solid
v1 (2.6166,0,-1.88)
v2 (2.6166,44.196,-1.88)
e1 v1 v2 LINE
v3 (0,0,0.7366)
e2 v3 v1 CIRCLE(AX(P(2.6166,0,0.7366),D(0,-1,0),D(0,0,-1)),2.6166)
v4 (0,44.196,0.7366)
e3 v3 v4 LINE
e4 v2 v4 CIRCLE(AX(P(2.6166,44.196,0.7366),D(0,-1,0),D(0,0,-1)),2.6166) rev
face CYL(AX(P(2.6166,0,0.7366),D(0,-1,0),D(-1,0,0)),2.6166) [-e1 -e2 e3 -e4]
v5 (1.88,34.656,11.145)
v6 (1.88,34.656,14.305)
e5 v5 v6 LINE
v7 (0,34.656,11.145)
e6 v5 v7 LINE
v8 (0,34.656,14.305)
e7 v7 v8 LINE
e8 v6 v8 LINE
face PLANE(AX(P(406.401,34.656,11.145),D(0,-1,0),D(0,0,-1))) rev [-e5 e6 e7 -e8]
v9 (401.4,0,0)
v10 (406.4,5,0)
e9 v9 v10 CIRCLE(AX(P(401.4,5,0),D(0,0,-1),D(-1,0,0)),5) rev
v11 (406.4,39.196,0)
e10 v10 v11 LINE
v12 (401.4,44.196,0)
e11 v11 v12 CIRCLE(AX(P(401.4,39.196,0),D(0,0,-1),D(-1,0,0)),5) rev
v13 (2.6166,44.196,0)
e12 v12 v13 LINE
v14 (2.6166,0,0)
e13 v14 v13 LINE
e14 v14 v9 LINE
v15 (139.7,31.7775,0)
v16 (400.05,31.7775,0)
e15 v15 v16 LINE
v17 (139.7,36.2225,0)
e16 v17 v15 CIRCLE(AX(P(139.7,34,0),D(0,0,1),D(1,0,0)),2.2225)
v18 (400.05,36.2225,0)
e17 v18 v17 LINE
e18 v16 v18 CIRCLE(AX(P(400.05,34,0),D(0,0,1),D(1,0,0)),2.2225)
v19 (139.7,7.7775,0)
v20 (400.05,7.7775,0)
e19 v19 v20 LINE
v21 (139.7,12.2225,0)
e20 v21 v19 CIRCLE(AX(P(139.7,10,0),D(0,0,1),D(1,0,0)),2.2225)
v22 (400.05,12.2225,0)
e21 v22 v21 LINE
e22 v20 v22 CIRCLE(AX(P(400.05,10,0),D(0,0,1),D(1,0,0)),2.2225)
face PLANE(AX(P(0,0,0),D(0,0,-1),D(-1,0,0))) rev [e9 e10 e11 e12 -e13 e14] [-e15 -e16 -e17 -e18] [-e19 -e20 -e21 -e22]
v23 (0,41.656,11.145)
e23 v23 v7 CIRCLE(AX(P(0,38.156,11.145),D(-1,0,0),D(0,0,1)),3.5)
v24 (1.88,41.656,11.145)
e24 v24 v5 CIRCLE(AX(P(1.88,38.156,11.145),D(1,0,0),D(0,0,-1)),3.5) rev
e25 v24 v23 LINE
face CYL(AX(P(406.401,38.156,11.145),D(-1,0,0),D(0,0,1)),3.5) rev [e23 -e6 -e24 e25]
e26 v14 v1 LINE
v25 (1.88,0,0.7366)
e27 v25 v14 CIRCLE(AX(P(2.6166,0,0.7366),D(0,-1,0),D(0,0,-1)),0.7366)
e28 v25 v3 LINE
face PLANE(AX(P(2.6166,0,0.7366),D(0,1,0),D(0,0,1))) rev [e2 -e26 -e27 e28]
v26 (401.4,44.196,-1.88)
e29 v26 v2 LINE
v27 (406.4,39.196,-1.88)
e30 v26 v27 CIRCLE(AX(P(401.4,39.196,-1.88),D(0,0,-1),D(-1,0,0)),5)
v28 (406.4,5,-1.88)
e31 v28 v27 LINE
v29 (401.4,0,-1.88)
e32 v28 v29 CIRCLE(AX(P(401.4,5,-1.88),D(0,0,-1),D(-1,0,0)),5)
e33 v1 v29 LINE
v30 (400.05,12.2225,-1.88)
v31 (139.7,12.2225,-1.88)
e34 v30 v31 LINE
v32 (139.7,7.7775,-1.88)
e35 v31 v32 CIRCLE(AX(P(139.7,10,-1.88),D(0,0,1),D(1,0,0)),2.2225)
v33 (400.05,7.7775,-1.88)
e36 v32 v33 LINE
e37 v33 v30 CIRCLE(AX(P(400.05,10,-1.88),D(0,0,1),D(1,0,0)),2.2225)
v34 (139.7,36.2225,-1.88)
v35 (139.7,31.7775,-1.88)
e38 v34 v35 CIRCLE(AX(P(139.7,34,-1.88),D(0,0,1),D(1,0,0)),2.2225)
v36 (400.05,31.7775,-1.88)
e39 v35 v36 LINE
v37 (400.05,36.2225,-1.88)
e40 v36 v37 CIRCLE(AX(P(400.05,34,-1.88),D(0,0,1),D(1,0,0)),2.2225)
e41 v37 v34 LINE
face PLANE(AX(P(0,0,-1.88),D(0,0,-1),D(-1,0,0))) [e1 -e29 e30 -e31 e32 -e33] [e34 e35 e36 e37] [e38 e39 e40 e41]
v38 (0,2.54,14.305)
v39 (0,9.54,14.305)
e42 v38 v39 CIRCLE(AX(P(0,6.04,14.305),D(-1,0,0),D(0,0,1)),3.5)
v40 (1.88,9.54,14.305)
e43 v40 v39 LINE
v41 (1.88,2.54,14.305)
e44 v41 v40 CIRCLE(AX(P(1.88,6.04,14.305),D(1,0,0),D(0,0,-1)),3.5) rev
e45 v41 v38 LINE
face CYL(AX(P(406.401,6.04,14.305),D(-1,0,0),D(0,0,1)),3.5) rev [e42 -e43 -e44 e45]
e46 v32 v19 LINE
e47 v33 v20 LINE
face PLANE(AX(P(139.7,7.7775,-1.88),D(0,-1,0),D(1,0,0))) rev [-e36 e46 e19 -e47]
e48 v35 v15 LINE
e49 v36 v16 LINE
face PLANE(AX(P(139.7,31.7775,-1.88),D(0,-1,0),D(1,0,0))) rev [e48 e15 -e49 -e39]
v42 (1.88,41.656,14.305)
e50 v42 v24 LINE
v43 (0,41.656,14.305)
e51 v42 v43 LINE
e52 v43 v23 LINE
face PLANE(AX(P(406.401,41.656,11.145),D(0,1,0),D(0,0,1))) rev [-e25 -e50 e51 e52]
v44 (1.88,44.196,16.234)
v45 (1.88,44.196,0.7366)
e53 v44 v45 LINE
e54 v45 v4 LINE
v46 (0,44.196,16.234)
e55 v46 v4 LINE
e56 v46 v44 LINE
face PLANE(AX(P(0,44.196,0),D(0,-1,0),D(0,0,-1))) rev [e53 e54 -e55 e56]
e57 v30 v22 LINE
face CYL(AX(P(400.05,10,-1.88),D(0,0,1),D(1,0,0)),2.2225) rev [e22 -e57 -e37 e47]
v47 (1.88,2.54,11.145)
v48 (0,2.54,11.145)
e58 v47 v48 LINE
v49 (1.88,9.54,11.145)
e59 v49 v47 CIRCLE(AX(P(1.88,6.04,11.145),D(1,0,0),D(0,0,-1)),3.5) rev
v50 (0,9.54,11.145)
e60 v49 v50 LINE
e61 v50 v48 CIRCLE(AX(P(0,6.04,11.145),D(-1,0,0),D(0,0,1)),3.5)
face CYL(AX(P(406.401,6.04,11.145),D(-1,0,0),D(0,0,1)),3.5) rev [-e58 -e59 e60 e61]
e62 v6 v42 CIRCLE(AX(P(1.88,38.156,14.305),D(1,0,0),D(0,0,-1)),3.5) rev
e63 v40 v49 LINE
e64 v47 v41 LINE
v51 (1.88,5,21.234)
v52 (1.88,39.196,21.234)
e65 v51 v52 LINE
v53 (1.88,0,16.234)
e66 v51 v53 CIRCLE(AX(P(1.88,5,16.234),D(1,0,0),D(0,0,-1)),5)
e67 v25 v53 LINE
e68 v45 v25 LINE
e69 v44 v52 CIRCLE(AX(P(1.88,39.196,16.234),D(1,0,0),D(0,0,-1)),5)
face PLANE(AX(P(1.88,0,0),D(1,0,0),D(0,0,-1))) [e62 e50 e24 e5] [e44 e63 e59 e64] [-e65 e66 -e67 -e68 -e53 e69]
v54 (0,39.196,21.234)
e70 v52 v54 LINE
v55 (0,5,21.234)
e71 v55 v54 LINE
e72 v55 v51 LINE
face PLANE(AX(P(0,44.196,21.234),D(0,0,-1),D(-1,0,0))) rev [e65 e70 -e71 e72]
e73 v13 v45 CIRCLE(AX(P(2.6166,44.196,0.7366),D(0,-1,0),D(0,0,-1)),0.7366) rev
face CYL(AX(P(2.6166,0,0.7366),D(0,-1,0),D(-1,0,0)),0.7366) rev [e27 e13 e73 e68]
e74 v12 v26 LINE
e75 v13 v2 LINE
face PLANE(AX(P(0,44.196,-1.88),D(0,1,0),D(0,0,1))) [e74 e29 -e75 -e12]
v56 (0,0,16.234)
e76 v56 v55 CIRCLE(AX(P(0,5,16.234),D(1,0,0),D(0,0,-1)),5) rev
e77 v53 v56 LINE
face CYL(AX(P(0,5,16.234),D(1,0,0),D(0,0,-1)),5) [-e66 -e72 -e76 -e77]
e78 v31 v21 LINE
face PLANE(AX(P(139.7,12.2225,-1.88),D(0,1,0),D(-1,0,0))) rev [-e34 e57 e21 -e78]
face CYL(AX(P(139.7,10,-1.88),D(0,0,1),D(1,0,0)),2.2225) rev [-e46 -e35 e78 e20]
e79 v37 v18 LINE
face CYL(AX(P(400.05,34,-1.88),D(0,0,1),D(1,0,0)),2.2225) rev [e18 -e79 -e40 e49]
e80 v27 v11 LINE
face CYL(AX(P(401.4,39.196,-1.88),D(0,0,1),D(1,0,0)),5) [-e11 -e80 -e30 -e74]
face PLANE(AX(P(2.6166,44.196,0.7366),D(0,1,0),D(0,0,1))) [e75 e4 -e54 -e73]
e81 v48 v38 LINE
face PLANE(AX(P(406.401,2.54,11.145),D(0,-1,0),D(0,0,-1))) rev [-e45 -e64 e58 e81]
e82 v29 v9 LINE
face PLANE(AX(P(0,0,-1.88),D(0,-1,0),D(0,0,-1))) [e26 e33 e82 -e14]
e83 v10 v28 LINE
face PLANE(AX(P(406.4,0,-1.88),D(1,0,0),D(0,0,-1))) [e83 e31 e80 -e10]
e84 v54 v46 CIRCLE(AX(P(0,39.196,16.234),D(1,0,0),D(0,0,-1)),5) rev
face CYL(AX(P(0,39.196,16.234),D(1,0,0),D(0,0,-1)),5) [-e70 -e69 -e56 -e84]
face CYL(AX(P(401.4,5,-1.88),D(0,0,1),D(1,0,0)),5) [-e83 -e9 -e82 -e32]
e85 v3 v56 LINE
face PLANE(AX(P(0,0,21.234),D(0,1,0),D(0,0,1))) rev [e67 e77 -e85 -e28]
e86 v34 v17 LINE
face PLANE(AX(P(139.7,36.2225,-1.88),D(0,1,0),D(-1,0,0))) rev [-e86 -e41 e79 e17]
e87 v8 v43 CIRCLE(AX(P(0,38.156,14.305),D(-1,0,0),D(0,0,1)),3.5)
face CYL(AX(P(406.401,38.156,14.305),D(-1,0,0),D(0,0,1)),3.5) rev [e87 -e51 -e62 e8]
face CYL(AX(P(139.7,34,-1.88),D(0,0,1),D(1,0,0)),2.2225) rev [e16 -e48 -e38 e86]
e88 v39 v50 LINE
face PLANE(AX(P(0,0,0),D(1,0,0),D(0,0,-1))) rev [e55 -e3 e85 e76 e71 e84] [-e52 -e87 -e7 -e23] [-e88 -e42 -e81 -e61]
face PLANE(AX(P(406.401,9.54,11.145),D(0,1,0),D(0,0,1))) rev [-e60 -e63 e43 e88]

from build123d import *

# Parameters (mm, degrees)
SKETCH1_W                    = 406.4
SKETCH1_H                    = 44.196
BASE_FLANGE1_DEPTH           = 1.88
EDGE_FLANGE1_STRIP_W         = 8.9932
EDGE_FLANGE1_STRIP_H         = 1.88
EDGE_FLANGE1_STRIP_CUT_DEPTH = 44.196
EDGE_FLANGE1_DEPTH           = 44.196
CUT_EXTRUDE1_REACH           = 411.347
FILLET1_R                    = 5


# Sheet-metal steps are written as plain solids
with BuildPart() as part:
    # Sketch1 → Base-Flange1 (new body)
    with BuildSketch(Plane.XY):
        with Locations((203.2, 22.098)):
            Rectangle(SKETCH1_W, SKETCH1_H)
        with BuildLine():
            Line((139.7, 36.2225), (400.05, 36.2225))
            ThreePointArc((400.05, 36.2225), (402.2725, 34), (400.05, 31.7775))
            Line((400.05, 31.7775), (139.7, 31.7775))
            ThreePointArc((139.7, 31.7775), (137.4775, 34), (139.7, 36.2225))
        make_face(mode=Mode.SUBTRACT)
        with BuildLine():
            Line((139.7, 12.2225), (400.05, 12.2225))
            ThreePointArc((400.05, 12.2225), (402.2725, 10), (400.05, 7.7775))
            Line((400.05, 7.7775), (139.7, 7.7775))
            ThreePointArc((139.7, 7.7775), (137.4775, 10), (139.7, 12.2225))
        make_face(mode=Mode.SUBTRACT)
    extrude(amount=-BASE_FLANGE1_DEPTH)

    # Edge-Flange1 strip (across the edge) → Edge-Flange1 strip cut (cut)
    with BuildSketch(Plane.XZ.offset(-44.196)):
        with Locations((-1.88, -0.94)):
            Rectangle(EDGE_FLANGE1_STRIP_W, EDGE_FLANGE1_STRIP_H)
    extrude(amount=EDGE_FLANGE1_STRIP_CUT_DEPTH, mode=Mode.SUBTRACT)

    # Edge-Flange1 section (across the edge) → Edge-Flange1 (add)
    with BuildSketch(Plane.XZ.offset(-44.196)):
        with BuildLine():
            Line((0, 0.7366), (0, 21.234))
            Line((0, 21.234), (1.88, 21.234))
            Line((1.88, 21.234), (1.88, 0.7366))
            ThreePointArc((1.88, 0.7366), (2.095745145, 0.215745145), (2.6166, 0))
            Line((2.6166, 0), (2.6166, -1.88))
            ThreePointArc((2.6166, -1.88), (0.766384396, -1.113615604), (0, 0.7366))
        make_face()
    extrude(amount=EDGE_FLANGE1_DEPTH)

    # Sketch9 → Cut-Extrude1 (cut, up to next)
    with BuildSketch(Plane.ZY, mode=Mode.PRIVATE) as cut_extrude1_sk1:
        with BuildLine():
            Line((11.145, 41.656), (14.305, 41.656))
            ThreePointArc((14.305, 41.656), (17.805, 38.156), (14.305, 34.656))
            Line((14.305, 34.656), (11.145, 34.656))
            ThreePointArc((11.145, 34.656), (7.645, 38.156), (11.145, 41.656))
        make_face()
    cut_extrude1_tool1 = extrude(cut_extrude1_sk1.sketch, amount=-CUT_EXTRUDE1_REACH, mode=Mode.PRIVATE) & part.part
    # Sketch9 → Cut-Extrude1 (cut, up to next)
    with BuildSketch(Plane.ZY, mode=Mode.PRIVATE) as cut_extrude1_sk2:
        with BuildLine():
            Line((11.145, 9.54), (14.305, 9.54))
            ThreePointArc((14.305, 9.54), (17.805, 6.04), (14.305, 2.54))
            Line((14.305, 2.54), (11.145, 2.54))
            ThreePointArc((11.145, 2.54), (7.645, 6.04), (11.145, 9.54))
        make_face()
    cut_extrude1_tool2 = extrude(cut_extrude1_sk2.sketch, amount=-CUT_EXTRUDE1_REACH, mode=Mode.PRIVATE) & part.part
    add(cut_extrude1_tool1.solids().sort_by_distance((0, 38.156, 12.725))[0], mode=Mode.SUBTRACT)
    add(cut_extrude1_tool2.solids().sort_by_distance((0, 6.04, 12.725))[0], mode=Mode.SUBTRACT)

    # Fillet1
    fillet1_edges = [part.edges().sort_by_distance(p)[0] for p in [
        (0.94, 44.196, 21.234),
        (0.94, 0, 21.234),
        (406.4, 44.196, -0.94),
        (406.4, 0, -0.94),
    ]]
    fillet(fillet1_edges, radius=FILLET1_R)


solid = part.part
